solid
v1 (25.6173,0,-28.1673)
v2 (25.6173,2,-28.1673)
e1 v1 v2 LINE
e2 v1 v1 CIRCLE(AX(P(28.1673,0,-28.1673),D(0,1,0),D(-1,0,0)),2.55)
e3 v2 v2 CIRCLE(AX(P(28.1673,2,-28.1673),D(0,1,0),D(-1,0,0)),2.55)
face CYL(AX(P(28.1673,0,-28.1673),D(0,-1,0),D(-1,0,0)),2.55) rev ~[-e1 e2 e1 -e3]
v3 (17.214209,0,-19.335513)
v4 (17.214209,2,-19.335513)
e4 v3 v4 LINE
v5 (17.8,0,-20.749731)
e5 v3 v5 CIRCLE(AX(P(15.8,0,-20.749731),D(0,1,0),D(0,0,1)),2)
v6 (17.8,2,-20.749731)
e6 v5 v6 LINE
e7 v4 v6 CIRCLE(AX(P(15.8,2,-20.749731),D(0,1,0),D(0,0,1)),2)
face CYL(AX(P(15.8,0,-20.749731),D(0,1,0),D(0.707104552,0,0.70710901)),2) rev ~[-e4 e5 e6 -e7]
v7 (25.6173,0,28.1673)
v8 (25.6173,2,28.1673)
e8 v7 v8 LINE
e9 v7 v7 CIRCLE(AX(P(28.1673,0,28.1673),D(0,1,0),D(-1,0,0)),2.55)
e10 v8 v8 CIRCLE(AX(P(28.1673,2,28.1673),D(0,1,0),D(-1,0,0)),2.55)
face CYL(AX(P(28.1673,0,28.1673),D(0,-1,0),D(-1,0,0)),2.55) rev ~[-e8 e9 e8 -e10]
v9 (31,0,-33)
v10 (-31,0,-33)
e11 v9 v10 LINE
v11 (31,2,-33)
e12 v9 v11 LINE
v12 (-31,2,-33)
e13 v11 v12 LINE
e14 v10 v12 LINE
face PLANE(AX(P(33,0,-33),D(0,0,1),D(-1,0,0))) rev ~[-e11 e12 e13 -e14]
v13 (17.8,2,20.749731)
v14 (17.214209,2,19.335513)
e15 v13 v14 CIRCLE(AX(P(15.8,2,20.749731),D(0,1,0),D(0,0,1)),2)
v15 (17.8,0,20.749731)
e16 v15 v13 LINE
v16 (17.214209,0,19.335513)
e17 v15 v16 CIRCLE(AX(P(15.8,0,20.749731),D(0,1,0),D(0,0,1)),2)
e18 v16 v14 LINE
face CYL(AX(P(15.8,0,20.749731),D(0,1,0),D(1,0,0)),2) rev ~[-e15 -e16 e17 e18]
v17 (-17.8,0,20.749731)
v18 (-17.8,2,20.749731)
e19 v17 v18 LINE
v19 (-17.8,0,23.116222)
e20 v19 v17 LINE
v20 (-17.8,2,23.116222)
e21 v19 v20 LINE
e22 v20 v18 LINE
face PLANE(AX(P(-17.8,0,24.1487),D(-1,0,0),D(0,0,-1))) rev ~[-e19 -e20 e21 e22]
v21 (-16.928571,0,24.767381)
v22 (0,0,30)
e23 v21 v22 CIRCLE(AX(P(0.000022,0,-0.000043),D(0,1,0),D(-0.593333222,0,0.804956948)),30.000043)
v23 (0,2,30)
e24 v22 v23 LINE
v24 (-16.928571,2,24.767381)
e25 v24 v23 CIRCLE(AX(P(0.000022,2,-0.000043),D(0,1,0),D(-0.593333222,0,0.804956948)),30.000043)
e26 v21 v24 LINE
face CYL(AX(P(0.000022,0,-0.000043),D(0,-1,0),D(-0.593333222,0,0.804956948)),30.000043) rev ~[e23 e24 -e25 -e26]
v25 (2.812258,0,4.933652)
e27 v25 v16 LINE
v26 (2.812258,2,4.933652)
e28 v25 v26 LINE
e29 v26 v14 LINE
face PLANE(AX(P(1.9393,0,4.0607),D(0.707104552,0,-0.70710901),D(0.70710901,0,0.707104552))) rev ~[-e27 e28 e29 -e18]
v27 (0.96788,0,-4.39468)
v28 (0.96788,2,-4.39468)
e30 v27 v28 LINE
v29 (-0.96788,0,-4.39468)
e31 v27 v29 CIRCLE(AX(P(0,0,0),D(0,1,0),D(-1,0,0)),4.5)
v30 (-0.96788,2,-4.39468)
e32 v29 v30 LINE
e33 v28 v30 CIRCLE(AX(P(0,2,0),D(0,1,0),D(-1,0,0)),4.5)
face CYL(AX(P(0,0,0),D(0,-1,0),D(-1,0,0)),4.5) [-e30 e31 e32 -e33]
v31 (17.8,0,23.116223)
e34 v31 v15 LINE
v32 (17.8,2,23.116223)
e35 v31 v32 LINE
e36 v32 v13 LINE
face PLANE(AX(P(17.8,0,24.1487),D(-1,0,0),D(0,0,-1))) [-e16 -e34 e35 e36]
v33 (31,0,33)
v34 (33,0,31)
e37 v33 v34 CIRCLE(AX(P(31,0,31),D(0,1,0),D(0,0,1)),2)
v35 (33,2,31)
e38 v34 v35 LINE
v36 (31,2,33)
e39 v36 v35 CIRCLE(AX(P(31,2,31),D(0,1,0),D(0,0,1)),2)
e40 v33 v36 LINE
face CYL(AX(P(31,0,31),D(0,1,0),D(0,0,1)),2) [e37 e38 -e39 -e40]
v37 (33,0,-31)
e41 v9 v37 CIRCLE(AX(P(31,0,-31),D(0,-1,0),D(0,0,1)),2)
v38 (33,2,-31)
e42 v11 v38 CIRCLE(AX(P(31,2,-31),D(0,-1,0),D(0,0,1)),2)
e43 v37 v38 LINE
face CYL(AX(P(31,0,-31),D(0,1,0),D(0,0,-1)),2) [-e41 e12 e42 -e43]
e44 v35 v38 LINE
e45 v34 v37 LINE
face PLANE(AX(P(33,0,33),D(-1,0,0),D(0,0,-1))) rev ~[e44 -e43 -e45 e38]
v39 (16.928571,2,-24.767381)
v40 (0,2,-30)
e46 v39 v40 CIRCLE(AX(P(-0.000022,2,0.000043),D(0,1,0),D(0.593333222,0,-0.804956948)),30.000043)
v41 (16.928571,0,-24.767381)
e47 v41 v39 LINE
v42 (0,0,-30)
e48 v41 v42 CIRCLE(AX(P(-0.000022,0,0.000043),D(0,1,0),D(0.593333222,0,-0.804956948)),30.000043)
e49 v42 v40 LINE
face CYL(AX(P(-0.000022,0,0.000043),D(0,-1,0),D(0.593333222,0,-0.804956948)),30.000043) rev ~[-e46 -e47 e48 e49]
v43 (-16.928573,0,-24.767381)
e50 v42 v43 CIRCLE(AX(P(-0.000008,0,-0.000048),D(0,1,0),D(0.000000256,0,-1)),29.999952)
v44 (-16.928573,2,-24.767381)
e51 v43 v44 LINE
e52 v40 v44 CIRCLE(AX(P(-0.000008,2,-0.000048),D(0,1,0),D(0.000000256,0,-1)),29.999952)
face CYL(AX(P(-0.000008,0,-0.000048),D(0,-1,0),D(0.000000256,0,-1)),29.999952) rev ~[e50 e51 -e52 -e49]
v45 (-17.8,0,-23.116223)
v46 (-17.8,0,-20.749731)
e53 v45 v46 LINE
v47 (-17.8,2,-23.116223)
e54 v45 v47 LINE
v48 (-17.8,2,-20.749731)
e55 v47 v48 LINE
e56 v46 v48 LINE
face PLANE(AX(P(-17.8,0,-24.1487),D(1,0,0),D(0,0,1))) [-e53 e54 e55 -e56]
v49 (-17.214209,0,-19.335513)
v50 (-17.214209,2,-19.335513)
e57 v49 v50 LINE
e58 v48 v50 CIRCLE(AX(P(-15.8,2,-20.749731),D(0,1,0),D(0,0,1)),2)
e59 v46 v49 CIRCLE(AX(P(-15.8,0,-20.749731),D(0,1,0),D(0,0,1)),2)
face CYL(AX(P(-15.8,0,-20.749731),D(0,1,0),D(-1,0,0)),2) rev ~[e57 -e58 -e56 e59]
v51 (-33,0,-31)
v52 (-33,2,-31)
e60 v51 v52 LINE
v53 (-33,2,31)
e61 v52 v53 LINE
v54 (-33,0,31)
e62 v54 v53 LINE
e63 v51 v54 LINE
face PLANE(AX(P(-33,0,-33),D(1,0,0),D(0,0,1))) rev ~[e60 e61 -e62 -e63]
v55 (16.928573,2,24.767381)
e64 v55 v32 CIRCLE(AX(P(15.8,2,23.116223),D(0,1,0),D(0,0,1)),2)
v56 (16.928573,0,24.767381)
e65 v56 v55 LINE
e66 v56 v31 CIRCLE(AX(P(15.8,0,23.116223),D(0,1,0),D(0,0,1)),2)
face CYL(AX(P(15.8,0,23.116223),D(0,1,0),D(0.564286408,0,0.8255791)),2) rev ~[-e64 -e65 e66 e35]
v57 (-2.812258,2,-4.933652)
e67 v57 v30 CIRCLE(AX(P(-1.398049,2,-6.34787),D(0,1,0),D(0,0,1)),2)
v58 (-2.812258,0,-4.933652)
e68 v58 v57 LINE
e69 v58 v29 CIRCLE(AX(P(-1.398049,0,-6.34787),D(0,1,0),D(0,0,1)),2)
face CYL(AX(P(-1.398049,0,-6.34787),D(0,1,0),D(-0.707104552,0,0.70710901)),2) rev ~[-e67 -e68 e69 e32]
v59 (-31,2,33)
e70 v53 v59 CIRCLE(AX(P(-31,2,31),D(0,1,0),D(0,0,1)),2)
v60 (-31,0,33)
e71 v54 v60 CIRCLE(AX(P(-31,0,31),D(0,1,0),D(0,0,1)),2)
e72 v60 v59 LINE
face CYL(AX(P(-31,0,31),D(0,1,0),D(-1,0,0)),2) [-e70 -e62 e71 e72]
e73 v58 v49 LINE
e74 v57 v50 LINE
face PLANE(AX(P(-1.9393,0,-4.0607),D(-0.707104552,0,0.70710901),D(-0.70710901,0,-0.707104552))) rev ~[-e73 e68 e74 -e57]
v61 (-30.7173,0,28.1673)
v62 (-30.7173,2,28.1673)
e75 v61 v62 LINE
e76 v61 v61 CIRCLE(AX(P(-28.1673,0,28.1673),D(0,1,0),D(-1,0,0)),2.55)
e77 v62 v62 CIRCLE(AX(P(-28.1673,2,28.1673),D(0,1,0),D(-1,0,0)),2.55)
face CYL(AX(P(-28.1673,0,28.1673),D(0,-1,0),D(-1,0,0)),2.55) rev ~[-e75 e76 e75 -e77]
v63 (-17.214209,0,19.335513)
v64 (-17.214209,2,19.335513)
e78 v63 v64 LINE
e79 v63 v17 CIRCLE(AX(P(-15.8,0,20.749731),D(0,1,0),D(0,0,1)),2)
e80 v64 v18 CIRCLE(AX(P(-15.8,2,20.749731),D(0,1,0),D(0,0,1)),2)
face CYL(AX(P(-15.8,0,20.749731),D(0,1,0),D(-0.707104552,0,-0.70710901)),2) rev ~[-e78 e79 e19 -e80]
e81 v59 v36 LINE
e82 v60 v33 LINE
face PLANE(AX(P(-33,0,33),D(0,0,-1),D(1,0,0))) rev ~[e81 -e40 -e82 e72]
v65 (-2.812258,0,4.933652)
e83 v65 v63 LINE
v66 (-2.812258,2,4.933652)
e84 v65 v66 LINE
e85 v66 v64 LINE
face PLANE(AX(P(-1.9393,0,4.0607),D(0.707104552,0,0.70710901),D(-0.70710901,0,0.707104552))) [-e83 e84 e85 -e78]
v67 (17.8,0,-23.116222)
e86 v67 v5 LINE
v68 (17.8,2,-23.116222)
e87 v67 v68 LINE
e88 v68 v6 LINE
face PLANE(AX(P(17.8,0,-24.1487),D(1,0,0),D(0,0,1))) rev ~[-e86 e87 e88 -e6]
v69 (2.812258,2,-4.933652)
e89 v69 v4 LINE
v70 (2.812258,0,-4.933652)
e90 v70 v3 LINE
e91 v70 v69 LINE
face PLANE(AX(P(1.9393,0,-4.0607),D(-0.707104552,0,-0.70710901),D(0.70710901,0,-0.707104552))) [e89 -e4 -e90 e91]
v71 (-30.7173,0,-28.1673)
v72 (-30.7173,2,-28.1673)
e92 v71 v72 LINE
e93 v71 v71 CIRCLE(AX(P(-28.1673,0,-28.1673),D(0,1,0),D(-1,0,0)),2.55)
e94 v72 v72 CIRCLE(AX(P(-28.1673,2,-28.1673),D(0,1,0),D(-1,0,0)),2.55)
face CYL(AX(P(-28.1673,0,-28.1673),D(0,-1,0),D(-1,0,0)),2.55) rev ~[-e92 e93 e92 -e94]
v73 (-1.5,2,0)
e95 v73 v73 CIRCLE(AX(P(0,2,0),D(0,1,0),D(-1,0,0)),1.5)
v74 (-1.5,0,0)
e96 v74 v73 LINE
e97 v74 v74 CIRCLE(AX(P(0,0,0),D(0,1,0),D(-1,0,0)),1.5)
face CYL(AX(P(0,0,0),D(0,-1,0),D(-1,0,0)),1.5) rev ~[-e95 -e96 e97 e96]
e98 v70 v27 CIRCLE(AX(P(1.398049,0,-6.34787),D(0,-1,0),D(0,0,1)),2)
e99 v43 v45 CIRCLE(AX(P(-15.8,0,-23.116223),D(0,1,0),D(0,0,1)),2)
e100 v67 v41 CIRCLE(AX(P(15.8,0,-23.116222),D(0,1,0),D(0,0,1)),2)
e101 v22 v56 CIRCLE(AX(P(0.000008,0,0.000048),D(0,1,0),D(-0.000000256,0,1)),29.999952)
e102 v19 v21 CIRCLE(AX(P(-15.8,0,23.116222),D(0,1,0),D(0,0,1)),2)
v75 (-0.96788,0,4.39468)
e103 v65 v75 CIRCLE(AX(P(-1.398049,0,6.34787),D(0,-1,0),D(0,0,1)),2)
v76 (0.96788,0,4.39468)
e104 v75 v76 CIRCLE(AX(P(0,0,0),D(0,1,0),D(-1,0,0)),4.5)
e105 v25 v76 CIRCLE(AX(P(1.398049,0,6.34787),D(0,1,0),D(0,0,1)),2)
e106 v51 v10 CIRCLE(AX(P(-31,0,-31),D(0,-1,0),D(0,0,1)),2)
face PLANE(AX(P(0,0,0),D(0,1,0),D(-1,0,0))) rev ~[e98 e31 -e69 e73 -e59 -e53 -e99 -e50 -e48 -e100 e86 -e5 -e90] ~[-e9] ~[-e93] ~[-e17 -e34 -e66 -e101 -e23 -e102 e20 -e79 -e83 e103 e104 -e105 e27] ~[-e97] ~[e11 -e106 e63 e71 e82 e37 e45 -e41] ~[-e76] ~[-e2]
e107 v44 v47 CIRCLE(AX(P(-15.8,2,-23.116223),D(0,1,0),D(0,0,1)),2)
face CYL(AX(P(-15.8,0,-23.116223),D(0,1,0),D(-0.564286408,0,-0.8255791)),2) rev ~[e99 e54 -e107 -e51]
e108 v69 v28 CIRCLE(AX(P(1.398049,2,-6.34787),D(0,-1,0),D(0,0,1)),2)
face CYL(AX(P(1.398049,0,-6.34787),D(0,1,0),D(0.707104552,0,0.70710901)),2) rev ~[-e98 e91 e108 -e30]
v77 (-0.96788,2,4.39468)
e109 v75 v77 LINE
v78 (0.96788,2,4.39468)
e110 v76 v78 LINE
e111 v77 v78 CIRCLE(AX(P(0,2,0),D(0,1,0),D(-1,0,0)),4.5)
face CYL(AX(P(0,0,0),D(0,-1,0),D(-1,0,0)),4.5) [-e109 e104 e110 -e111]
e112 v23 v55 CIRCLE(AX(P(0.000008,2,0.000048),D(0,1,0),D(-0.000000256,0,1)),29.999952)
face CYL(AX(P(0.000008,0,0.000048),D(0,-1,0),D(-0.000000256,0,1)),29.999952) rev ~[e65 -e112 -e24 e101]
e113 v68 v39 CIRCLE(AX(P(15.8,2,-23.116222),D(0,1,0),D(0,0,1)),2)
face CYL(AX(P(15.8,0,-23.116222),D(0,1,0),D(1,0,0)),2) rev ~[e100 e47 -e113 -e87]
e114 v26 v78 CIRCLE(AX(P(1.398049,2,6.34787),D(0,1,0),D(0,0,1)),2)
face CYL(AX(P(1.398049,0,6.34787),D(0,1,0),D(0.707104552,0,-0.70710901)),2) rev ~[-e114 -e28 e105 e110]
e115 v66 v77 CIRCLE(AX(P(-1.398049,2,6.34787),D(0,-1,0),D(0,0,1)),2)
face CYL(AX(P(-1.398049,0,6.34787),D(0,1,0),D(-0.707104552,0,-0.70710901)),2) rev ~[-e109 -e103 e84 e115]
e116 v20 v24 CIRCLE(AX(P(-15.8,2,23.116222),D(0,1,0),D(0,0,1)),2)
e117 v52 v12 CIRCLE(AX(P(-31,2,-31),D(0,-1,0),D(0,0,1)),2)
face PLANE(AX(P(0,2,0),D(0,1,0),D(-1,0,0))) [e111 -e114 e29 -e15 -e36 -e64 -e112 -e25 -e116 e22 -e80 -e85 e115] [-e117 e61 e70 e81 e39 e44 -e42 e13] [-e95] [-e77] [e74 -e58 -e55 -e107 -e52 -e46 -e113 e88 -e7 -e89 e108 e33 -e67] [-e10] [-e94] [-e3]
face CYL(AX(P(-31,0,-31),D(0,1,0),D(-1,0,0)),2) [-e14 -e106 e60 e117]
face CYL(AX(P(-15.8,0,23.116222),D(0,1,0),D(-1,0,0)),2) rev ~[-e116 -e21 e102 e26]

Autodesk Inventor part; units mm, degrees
ref_plane "YZ Plane" through (0, 0, 0) normal (1, 0, 0) x (0, 1, 0)
ref_plane "XZ Plane" through (0, 0, 0) normal (0, 1, 0) x (-1, 0, 0)
ref_plane "XY Plane" through (0, 0, 0) normal (0, 0, 1) x (1, 0, 0)
sketch "Sketch1" plane through (0, 0, 0) normal (0, 1, 0) x (-1, 0, 0)
  arc A0 (20.126, -22.2473) -> (-20.126, -22.2473) centre (0, 0) ccw construction
  circle A1 centre (0, 0) radius 33 construction
  line L0 (33, 33) -> (-33, 33)
  line L1 (-33, 33) -> (-33, -33)
  line L2 (-33, -33) -> (33, -33)
  line L3 (33, -33) -> (33, 33)
  line L4 (33, 33) -> (23.3345, 23.3345) construction
  line L5 (-33, 33) -> (-23.3345, 23.3345) construction
  line L6 (23.3345, 23.3345) -> (-23.3345, -23.3345) construction
  line L7 (23.3345, -23.3345) -> (33, -33) construction
  line L8 (-23.3345, -23.3345) -> (-33, -33) construction
  line L9 (-23.3345, 23.3345) -> (23.3345, -23.3345) construction
  line L10 (0, -33) -> (0, 33) construction
  line L11 (33, 0) -> (-33, 0) construction
  circle A2 centre (0, 0) radius 1.5
  circle A3 centre (0, 0) radius 4.5
  line L12 (4.0607, -1.9393) -> (22.2473, -20.126) construction
  line L13 (1.9393, -4.0607) -> (17.8, -19.9213)
  arc A4 (0, -30) -> (17.8, -24.1487) centre (0, 0) ccw
  line L14 (23.3345, 23.3345) -> (-23.3345, -23.3345) construction
  line L15 (-4.0607, -1.9393) -> (-22.2473, -20.126) construction
  line L16 (-1.9393, -4.0607) -> (-17.8, -19.9213)
  arc A5 (-20.126, -22.2473) -> (-17.8, -24.1487) centre (0, 0) ccw construction
  line L17 (17.8, -24.1487) -> (17.8, -19.9213)
  line L18 (-17.8, -24.1487) -> (-17.8, -19.9213)
  line L19 (17.8, -22.035) -> (-17.8, -22.035) construction
  arc A6 (-17.8, -24.1487) -> (0, -30) centre (0, 0) ccw
  line L20 (-17.8, -19.9213) -> (-20.126, -22.2473) construction
  line L21 (17.8, -19.9213) -> (20.126, -22.2473) construction
  arc A7 (17.8, -24.1487) -> (20.126, -22.2473) centre (0, 0) ccw construction
  line L22 (1.9393, 4.0607) -> (17.8, 19.9213)
  arc A8 (17.8, 24.1487) -> (0, 30) centre (0, 0) ccw
  line L23 (-1.9393, 4.0607) -> (-17.8, 19.9213)
  arc A9 (-17.8, 24.1487) -> (-20.126, 22.2473) centre (0, 0) ccw construction
  line L24 (17.8, 24.1487) -> (17.8, 19.9213)
  line L25 (-17.8, 24.1487) -> (-17.8, 19.9213)
  arc A10 (0, 30) -> (-17.8, 24.1487) centre (0, 0) ccw
  line L26 (-17.8, 19.9213) -> (-20.126, 22.2473) construction
  line L27 (17.8, 19.9213) -> (20.126, 22.2473) construction
  arc A11 (20.126, 22.2473) -> (17.8, 24.1487) centre (0, 0) ccw construction
  circle A12 centre (28.1673, -28.1673) radius 2.55
  circle A13 centre (-28.1673, -28.1673) radius 2.55
  circle A14 centre (-28.1673, 28.1673) radius 2.55
  circle A15 centre (28.1673, 28.1673) radius 2.55
  point P0 (0, -22.035)
  dimension "d22" = 60
  dimension "d24" = 3
  dimension "d25" = 3
  dimension "d26" = 3
  dimension "d27" = 1.5
  dimension "d28" = 3
  dimension "d31" = 35.6
  dimension "d32" = 5.1
  dimension "d33" = 5.1
  dimension "d34" = 5.1
  dimension "d35" = 5.1
extrude "Extrusion1" add sketch "Sketch1" along normal blind 2 contours L3 L2 L1 L0 | A3
fillet "Fillet3" radius 2 16 edges at (-17.8, 1, 19.9213) (-1.9393, 1, 4.0607) (1.9393, 1, 4.0607) (-17.8, 1, 24.1487) (17.8, 1, 24.1487) (17.8, 1, 19.9213) (-1.9393, 1, -4.0607) (1.9393, 1, -4.0607) (17.8, 1, -19.9213) (17.8, 1, -24.1487) (-17.8, 1, -19.9213) (-17.8, 1, -24.1487) (-33, 1, 33) (-33, 1, -33) (33, 1, -33) (33, 1, 33)
properties part number "Feeder Bottom Plate" material "Aluminum 6061"
